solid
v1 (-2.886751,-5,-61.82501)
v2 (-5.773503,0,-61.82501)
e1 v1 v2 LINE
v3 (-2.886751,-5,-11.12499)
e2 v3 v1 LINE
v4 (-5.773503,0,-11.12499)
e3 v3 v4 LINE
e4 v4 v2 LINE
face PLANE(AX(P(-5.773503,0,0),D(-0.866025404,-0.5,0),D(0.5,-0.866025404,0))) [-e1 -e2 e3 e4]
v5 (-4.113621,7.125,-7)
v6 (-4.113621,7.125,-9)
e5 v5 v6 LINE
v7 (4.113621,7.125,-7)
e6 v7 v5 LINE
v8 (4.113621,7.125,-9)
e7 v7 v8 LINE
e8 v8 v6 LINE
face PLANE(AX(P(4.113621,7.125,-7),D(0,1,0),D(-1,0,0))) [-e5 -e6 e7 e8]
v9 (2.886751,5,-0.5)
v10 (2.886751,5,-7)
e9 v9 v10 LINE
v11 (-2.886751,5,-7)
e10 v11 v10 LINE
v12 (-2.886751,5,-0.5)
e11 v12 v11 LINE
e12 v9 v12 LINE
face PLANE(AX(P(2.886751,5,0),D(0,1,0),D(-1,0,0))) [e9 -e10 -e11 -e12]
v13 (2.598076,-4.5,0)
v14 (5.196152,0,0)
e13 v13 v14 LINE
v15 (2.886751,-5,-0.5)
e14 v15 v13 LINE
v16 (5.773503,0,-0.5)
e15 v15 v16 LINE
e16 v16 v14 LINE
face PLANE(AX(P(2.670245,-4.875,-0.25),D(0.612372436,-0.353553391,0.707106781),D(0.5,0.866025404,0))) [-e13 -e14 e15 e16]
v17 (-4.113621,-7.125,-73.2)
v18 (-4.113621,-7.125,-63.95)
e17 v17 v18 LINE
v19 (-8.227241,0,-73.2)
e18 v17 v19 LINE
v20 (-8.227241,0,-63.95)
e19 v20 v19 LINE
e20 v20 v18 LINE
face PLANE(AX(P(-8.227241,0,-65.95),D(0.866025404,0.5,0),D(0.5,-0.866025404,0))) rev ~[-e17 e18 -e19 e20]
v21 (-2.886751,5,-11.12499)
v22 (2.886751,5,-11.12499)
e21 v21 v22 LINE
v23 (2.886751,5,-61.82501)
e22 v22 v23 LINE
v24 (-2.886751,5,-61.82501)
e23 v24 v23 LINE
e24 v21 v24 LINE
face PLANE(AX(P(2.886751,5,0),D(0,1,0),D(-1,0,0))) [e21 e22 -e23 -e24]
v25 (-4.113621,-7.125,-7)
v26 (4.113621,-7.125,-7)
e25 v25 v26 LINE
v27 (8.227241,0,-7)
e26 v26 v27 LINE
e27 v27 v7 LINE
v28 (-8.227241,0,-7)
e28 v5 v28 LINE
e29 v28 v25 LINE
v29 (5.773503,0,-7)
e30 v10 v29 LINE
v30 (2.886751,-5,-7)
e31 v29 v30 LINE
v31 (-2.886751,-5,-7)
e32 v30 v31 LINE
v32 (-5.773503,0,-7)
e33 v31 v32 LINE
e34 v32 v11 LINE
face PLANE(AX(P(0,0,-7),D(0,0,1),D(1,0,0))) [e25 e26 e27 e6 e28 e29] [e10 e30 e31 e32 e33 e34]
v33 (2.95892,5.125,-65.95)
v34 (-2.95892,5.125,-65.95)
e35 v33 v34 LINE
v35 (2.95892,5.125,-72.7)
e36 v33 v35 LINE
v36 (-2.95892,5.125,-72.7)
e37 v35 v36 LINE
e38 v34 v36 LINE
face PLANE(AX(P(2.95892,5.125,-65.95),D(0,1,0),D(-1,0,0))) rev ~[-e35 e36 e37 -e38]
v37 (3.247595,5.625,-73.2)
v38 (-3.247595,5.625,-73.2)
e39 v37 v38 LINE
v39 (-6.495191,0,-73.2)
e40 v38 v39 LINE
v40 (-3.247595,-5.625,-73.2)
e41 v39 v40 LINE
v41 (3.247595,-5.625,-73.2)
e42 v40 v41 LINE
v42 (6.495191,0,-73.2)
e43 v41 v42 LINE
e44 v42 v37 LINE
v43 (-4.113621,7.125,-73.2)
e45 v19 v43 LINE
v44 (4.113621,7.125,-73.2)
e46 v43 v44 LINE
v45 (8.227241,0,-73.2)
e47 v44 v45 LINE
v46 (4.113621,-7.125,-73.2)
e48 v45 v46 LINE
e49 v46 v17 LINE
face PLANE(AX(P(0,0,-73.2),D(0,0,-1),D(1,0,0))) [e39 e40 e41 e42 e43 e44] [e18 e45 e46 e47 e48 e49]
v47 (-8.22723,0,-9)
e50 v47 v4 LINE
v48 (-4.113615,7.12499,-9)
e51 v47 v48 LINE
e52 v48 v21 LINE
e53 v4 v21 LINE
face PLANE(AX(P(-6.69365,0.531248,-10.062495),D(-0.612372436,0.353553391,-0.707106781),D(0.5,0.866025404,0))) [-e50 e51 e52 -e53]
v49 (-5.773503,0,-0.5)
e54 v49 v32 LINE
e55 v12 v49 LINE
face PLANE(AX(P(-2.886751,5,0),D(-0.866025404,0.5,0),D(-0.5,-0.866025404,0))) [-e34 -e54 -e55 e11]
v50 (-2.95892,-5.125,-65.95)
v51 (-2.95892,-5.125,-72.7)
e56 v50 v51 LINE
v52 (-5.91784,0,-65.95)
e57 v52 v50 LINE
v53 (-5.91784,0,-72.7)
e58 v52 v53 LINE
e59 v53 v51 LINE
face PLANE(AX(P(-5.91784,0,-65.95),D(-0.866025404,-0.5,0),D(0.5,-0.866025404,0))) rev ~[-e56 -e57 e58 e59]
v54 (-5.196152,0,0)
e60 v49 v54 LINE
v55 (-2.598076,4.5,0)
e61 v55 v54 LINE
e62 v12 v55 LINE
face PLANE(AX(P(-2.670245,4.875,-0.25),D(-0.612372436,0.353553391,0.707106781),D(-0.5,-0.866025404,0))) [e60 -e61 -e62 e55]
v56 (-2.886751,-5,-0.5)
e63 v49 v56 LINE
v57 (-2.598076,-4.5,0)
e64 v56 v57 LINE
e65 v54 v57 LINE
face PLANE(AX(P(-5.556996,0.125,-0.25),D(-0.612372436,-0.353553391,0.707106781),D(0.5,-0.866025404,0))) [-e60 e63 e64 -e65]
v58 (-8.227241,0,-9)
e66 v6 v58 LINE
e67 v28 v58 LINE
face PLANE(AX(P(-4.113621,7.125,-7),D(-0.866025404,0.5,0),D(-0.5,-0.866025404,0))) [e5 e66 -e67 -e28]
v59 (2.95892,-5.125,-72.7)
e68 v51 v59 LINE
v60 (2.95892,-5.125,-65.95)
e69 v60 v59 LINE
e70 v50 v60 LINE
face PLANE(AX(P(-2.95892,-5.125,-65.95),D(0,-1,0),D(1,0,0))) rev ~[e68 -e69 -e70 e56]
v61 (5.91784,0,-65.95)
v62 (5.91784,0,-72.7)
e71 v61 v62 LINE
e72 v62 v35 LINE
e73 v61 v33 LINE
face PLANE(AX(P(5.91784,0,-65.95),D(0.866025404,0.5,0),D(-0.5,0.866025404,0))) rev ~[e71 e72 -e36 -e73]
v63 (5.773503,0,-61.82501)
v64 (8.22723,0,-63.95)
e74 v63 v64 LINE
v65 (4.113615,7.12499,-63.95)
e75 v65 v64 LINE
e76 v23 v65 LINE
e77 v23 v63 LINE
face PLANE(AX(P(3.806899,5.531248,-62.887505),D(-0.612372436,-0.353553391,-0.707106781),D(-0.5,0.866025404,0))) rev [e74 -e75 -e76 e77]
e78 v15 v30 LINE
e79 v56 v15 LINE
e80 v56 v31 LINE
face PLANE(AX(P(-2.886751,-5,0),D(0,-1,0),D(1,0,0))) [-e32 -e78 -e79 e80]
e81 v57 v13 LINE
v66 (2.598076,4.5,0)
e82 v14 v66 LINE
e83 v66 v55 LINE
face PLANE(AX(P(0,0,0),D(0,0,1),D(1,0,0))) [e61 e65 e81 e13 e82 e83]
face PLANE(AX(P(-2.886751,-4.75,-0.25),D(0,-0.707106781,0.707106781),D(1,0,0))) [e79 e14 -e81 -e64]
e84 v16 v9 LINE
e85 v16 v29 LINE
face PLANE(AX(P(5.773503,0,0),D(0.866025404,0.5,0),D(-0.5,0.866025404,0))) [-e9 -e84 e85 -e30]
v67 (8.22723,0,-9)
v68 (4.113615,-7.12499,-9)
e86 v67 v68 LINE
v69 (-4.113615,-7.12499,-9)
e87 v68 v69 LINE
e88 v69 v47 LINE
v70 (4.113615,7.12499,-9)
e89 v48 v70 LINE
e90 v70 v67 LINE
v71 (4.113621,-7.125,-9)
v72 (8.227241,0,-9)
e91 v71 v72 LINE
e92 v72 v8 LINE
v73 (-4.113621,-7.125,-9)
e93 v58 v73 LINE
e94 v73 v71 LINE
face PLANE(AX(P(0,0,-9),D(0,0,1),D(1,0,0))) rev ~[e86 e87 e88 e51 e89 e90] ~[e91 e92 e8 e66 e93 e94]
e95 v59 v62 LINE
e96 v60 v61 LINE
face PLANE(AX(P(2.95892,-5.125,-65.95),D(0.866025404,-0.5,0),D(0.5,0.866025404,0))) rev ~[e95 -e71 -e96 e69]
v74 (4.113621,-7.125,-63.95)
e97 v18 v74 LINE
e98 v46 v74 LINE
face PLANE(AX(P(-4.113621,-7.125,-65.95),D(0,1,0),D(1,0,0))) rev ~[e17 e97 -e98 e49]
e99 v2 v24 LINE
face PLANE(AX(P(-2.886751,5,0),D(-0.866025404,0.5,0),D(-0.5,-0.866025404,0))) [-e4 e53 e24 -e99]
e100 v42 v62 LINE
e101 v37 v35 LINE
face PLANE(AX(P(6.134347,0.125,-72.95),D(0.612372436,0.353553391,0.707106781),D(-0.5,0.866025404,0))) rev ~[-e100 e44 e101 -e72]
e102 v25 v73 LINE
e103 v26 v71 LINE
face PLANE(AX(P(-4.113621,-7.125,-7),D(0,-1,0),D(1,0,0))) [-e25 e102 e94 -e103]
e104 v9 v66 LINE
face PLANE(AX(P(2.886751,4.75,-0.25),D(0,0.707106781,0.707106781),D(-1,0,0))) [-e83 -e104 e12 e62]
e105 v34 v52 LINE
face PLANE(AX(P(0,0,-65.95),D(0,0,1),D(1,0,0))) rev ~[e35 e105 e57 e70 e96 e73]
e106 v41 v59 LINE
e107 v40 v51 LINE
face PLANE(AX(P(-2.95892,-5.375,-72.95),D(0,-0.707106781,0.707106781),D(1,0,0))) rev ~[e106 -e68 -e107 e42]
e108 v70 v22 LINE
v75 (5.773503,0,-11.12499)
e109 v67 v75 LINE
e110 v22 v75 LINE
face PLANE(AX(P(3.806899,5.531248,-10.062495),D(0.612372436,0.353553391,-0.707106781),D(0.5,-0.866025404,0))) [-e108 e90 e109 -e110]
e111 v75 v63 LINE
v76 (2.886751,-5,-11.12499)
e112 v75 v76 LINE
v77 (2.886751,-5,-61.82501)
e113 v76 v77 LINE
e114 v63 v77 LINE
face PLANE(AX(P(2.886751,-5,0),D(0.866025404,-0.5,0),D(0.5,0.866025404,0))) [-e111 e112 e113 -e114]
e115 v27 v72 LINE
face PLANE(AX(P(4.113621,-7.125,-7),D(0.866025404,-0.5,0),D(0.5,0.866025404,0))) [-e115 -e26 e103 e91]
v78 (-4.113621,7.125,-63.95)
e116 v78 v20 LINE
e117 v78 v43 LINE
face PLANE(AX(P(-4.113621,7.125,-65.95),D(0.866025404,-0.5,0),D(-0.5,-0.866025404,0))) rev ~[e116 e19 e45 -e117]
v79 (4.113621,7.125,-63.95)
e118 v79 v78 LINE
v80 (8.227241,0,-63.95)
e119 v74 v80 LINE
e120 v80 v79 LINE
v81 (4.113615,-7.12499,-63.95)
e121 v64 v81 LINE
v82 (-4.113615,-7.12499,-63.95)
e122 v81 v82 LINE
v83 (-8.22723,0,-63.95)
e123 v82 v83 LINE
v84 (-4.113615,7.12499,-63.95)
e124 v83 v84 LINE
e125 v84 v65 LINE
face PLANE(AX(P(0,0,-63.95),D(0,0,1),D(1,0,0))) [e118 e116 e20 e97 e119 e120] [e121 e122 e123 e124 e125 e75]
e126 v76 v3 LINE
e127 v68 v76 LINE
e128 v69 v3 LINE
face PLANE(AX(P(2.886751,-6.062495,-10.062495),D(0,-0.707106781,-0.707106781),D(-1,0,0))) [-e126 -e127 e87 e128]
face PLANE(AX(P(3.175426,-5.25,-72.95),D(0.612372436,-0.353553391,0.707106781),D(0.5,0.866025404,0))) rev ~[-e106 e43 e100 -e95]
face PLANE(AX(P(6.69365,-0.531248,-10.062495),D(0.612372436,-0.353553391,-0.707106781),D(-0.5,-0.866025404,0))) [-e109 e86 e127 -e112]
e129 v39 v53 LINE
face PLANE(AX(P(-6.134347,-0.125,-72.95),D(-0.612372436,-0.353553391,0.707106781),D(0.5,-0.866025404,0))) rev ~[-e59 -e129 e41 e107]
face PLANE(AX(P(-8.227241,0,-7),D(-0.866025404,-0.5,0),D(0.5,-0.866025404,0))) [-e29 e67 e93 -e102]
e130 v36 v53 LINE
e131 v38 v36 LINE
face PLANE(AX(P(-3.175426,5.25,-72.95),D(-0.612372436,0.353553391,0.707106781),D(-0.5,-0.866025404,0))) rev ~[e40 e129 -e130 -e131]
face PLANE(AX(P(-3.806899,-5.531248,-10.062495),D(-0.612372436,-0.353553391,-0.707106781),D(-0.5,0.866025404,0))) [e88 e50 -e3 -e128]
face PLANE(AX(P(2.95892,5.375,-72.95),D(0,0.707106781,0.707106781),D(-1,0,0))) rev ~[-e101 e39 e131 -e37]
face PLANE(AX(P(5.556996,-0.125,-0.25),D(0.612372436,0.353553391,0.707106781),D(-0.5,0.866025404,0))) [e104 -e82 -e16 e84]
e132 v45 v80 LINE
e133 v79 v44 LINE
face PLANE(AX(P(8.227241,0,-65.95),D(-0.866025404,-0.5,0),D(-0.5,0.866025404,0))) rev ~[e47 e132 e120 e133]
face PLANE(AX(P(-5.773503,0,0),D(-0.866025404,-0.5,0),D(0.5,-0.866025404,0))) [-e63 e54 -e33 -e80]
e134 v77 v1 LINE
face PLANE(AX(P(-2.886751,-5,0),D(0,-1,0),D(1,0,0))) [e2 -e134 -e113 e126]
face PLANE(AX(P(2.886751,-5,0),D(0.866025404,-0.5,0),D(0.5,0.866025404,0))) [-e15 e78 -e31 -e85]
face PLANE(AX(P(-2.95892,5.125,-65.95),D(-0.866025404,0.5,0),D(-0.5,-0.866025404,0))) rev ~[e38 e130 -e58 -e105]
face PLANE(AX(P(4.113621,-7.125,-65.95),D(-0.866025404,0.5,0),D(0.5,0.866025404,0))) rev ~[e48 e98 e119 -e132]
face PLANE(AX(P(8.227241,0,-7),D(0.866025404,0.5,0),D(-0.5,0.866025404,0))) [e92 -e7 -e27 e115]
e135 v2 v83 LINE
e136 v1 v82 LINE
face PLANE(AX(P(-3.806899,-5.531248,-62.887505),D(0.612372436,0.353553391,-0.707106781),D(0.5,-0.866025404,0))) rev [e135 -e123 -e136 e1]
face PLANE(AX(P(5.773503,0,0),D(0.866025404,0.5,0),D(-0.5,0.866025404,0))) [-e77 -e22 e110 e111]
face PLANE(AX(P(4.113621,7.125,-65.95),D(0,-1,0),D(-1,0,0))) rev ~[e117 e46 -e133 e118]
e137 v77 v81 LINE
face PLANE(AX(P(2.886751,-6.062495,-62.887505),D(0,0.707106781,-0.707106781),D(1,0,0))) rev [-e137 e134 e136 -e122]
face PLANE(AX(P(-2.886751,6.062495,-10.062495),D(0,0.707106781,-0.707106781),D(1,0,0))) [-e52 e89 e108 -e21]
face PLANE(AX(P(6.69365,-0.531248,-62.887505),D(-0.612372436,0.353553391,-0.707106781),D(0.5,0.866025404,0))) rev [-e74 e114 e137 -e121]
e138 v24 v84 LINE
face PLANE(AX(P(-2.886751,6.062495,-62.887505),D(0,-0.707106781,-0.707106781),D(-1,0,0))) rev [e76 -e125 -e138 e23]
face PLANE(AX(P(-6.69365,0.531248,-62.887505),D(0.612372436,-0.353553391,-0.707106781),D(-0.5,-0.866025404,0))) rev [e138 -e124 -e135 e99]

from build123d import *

# Parameters (mm, degrees)
F1_DEPTH = 65.95
F3_DEPTH = 7.25
F5_DEPTH = 2
F8_DEPTH = 2
F9_SIZE  = 0.5
F10_SIZE = 2.12499


# Not quite as in the source:
# - a fillet or chamfer is up to 0.001 mm smaller than in the source, because OpenCascade refuses the exact size


with BuildPart() as f1:
    # F0 (on Top) → F1 (new body)
    with BuildSketch(Plane.XY):
        Polygon((-2.8867513459, -5), (2.8867513459, -5), (5.7735026919, 0), (2.8867513459, 5), (-2.8867513459, 5), (-5.7735026919, 0), align=None)
    extrude(amount=-F1_DEPTH)



with BuildPart() as f3:
    # F2 (on face) → F3 (new body)
    with BuildSketch(Plane(origin=(0, 0, -65.95), x_dir=(1, 0, 0), z_dir=(0, 0, -1))):
        Polygon((4.113620668, 7.125), (-4.113620668, 7.125), (-8.227241336, 0), (-4.113620668, -7.125), (4.113620668, -7.125), (8.227241336, 0), align=None)
        Polygon((2.9589201296, 5.125), (5.9178402592, 0), (2.9589201296, -5.125), (-2.9589201296, -5.125), (-5.9178402592, 0), (-2.9589201296, 5.125), align=None, mode=Mode.SUBTRACT)
    extrude(amount=F3_DEPTH)


with BuildPart() as f1_1:
    add(f1.part)

    add(f3.part)  # F5 merges F3
    # F4 (on face) → F5 (join)
    with BuildSketch(Plane.XY.offset(-65.95)):
        Polygon((-8.227241336, 0), (-4.113620668, -7.125), (4.113620668, -7.125), (8.227241336, 0), (4.113620668, 7.125), (-4.113620668, 7.125), align=None)
    extrude(amount=F5_DEPTH)

    # F7 (on offset) → F8 (join)
    with BuildSketch(Plane.XY.offset(-7)):
        Polygon((-8.227241336, 0), (-4.113620668, -7.125), (4.113620668, -7.125), (8.227241336, 0), (4.113620668, 7.125), (-4.113620668, 7.125), align=None)
    extrude(amount=-F8_DEPTH)

    # F9
    f9_edges = [f1_1.edges().sort_by_distance(p)[0] for p in [
        (-4.330127, -2.5, 0),
        (0, -5, 0),
        (4.330127, -2.5, 0),
        (4.330127, 2.5, 0),
        (0, 5, 0),
        (-4.330127, 2.5, 0),
        (-4.43838, 2.5625, -73.2),
        (-4.43838, -2.5625, -73.2),
        (0, -5.125, -73.2),
        (4.43838, -2.5625, -73.2),
        (4.43838, 2.5625, -73.2),
        (0, 5.125, -73.2),
    ]]
    chamfer(f9_edges, length=F9_SIZE)

    # F10 (size 2.125 in the source; OpenCascade refuses exactly that, so slightly less here)
    f10_edges = [f1_1.edges().sort_by_distance(p)[0] for p in [
        (0, 5, -63.95),
        (-4.330127, 2.5, -63.95),
        (-4.330127, -2.5, -63.95),
        (0, -5, -63.95),
        (4.330127, -2.5, -63.95),
        (4.330127, 2.5, -63.95),
        (-4.330127, 2.5, -9),
        (0, 5, -9),
        (-4.330127, -2.5, -9),
        (0, -5, -9),
        (4.330127, -2.5, -9),
        (4.330127, 2.5, -9),
    ]]
    chamfer(f10_edges, length=F10_SIZE)


solid = f1_1.part
